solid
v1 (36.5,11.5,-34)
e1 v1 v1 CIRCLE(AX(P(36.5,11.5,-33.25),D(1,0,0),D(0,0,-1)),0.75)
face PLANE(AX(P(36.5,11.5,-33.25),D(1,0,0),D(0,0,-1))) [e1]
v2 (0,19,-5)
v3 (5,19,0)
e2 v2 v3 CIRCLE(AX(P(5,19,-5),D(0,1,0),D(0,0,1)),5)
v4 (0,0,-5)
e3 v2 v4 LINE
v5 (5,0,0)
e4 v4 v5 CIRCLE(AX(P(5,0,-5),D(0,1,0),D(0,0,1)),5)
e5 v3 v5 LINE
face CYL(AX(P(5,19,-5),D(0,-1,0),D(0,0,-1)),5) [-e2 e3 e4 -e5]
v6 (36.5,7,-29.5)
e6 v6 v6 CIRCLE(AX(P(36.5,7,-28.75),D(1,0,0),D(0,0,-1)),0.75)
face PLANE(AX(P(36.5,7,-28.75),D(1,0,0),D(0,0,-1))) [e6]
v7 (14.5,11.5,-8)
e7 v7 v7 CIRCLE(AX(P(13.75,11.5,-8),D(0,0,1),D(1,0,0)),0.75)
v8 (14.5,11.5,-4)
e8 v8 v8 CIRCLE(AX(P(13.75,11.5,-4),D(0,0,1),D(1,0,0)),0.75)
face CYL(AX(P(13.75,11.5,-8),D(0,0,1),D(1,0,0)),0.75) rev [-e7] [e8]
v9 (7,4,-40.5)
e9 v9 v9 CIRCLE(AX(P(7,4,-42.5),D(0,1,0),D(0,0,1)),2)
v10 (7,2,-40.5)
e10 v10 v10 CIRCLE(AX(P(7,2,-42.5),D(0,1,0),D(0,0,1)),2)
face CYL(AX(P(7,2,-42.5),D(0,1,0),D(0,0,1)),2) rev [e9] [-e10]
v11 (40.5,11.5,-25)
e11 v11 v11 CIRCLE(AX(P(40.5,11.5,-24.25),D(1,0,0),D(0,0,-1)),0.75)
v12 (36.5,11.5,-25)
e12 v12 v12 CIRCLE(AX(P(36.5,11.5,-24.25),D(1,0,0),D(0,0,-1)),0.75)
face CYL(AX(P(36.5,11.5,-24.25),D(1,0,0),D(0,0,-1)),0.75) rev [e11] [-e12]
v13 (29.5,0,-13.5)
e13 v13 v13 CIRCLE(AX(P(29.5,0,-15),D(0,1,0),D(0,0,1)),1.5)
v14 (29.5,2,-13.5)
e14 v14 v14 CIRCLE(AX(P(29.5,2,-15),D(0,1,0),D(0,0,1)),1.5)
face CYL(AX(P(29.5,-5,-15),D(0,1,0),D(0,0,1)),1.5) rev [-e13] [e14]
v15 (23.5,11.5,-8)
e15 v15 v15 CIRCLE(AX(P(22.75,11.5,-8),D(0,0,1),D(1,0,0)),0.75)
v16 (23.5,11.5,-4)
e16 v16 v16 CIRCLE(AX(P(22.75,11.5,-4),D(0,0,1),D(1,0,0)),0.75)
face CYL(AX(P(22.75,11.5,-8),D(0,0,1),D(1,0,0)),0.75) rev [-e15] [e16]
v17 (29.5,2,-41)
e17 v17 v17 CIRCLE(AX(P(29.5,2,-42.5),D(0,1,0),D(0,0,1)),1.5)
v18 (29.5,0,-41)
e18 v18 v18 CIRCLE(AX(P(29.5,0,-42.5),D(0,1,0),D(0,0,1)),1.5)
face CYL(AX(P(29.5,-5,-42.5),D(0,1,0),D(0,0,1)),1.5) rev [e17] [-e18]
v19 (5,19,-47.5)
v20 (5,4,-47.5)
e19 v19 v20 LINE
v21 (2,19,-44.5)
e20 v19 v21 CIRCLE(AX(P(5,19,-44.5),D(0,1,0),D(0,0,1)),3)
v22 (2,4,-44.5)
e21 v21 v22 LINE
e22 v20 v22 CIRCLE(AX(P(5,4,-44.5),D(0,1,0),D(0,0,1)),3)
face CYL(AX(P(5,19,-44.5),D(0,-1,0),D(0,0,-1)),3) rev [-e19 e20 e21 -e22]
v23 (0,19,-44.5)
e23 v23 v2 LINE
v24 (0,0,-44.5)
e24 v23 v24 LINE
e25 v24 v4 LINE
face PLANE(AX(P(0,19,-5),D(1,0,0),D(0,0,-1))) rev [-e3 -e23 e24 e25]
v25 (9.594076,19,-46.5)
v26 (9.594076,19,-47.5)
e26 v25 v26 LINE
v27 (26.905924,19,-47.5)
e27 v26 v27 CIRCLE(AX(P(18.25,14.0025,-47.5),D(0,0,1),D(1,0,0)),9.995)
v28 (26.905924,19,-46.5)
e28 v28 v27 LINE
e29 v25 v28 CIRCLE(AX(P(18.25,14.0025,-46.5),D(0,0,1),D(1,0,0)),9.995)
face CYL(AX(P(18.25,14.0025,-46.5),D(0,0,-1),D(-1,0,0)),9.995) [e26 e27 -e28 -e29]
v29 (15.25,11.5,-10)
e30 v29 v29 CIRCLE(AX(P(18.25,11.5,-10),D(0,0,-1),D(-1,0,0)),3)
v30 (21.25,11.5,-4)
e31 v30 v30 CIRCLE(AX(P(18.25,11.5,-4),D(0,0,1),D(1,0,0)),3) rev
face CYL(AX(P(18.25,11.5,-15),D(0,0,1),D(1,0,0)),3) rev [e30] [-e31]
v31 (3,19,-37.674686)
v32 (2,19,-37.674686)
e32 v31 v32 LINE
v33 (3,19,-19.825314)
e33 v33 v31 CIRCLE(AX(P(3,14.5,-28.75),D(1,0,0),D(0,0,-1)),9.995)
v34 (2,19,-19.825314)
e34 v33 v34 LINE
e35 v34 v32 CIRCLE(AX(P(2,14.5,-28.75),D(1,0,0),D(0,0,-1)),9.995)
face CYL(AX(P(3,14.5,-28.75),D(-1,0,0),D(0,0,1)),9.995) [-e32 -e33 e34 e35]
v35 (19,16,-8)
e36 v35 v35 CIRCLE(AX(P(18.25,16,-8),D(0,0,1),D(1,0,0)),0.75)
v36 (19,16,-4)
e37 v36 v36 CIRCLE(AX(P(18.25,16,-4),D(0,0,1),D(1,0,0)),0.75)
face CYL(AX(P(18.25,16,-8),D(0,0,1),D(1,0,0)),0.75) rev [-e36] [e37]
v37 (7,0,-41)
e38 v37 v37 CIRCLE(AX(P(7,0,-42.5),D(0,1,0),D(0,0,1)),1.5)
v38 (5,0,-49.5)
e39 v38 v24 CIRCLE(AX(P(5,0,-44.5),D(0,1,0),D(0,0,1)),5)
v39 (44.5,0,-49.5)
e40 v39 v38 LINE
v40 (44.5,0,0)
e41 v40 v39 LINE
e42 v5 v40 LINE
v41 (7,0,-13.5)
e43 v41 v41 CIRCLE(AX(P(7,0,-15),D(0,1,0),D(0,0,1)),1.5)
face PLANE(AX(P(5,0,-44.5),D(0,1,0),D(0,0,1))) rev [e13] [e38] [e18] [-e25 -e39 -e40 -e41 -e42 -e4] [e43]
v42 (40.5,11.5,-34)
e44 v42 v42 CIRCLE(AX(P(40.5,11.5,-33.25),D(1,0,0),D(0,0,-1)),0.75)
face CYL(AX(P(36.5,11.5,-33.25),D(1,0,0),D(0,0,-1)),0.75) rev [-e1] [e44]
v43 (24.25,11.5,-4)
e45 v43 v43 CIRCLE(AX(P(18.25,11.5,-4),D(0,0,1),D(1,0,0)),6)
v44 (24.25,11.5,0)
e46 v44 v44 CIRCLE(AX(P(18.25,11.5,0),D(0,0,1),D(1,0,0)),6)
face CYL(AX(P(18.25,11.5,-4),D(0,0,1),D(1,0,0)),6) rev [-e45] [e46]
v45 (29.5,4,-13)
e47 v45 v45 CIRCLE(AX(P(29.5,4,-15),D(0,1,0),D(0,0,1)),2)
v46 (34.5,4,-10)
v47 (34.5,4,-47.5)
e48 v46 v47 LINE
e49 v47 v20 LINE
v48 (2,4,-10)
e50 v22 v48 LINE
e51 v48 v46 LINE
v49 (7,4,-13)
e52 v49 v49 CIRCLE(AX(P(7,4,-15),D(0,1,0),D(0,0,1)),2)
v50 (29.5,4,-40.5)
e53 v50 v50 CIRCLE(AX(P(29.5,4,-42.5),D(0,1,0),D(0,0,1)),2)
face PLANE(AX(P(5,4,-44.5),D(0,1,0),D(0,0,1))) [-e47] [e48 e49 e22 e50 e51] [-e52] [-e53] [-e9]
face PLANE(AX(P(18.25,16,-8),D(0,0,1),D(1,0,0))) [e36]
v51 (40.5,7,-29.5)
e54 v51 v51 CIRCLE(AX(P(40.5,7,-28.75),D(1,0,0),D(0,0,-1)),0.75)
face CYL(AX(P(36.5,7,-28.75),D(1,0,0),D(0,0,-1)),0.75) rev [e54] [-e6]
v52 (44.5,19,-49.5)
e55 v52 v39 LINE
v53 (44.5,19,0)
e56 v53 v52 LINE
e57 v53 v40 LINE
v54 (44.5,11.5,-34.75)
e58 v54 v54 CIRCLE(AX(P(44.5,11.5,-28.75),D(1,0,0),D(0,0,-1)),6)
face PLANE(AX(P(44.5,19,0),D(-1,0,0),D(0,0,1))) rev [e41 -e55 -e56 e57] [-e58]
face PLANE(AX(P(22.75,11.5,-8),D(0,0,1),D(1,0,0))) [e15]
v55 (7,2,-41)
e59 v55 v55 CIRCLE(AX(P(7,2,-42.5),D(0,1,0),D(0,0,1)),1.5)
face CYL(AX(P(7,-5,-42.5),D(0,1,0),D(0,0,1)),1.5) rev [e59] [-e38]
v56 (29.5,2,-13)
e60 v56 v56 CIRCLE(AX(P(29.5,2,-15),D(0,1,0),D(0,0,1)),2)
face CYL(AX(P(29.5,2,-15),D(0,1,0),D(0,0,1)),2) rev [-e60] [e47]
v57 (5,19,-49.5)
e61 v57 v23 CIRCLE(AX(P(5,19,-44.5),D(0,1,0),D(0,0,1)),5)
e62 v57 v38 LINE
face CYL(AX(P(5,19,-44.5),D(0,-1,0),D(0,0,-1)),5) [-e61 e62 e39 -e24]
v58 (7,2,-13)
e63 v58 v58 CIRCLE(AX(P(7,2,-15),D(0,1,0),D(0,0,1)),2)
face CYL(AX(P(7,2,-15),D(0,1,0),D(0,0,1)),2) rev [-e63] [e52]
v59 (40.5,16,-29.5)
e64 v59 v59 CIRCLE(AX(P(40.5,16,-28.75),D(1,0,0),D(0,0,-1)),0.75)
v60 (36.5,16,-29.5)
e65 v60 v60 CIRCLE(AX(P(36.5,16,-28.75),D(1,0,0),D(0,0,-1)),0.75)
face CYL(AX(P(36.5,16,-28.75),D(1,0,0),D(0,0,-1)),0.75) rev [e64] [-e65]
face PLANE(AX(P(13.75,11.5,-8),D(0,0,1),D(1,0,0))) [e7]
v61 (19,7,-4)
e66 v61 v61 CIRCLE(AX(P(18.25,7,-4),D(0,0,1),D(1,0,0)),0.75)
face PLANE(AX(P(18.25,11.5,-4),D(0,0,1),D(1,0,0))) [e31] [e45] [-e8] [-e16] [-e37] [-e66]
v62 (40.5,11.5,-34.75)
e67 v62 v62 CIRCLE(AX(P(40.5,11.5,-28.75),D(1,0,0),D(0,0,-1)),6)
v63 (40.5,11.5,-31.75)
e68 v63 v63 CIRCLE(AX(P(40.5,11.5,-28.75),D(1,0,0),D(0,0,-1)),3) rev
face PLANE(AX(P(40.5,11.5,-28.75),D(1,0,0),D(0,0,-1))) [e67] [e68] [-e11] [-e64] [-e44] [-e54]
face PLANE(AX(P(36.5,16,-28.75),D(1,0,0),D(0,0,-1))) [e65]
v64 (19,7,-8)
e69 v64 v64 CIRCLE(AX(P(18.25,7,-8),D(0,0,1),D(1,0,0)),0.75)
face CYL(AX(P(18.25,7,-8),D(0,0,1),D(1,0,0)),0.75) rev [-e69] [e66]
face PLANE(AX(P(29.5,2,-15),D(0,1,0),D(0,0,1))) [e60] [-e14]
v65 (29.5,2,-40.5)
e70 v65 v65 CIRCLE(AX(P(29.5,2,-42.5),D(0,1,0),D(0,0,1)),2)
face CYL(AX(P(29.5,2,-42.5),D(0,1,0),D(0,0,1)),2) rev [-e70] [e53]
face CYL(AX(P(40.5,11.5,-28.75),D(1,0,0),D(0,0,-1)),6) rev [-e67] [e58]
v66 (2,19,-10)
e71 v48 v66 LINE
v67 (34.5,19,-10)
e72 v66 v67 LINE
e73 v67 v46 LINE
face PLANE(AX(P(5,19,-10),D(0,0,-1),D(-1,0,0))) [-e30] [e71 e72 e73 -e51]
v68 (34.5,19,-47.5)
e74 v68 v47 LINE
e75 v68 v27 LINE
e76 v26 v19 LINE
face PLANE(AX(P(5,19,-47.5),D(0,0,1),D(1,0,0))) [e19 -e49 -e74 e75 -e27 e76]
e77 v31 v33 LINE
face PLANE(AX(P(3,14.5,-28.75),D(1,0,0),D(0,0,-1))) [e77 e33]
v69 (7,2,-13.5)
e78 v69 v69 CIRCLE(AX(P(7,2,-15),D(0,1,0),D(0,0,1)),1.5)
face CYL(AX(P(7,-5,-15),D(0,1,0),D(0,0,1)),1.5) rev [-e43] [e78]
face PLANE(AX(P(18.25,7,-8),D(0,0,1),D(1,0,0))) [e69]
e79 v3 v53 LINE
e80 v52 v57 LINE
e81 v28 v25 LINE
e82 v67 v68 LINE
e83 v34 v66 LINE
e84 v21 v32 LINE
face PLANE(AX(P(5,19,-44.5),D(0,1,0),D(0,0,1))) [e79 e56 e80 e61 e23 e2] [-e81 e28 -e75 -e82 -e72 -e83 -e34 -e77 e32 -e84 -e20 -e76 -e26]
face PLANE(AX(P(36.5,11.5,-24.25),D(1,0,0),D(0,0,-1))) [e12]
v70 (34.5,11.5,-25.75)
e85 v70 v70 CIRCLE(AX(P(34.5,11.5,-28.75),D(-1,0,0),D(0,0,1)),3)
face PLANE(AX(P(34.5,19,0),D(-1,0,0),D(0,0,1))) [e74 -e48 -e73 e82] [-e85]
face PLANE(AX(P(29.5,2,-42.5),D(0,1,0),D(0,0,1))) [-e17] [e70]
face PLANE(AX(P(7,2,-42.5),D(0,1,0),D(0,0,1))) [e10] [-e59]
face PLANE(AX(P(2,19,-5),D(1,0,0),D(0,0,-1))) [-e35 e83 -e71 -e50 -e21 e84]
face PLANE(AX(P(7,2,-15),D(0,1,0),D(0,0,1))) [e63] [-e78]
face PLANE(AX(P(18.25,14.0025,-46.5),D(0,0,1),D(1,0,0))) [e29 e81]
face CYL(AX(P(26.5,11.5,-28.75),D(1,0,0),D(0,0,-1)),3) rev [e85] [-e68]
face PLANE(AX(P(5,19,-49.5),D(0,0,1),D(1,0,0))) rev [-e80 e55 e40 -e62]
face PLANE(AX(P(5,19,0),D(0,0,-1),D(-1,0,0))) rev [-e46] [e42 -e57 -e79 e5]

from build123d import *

# Parameters (mm, degrees)
EXTRUDE_1_DEPTH     = 19
SHELL_START         = 4
SHELL_2_DEPTH       = 15
SKETCH_2_R          = 3
CUT_EXTRUDE_1_DEPTH = 15
SKETCH_3_R          = 6
CUT_EXTRUDE_2_DEPTH = 4
SKETCH_4_R          = 3
CUT_EXTRUDE_3_DEPTH = 18
SKETCH_5_R          = 6
CUT_EXTRUDE_4_DEPTH = 4
SKETCH_8_R          = 0.75
CUT_EXTRUDE_5_DEPTH = 4
SKETCH_9_R          = 0.75
CUT_EXTRUDE_6_DEPTH = 4
EXTRUDE_4_DEPTH     = 1
EXTRUDE_5_DEPTH     = 1
SKETCH_13_R         = 2
CUT_EXTRUDE_7_DEPTH = 2
SKETCH_14_R         = 1.5
CUT_EXTRUDE_8_DEPTH = 9


# Read off the part's stored shape, not the designer's step: 抽壳2
with BuildPart() as part:
    # 草图1 → 凸台-拉伸1 (new body)
    with BuildSketch(Plane(origin=(0, 0, 0), x_dir=(1, 0, 0), z_dir=(0, 1, 0))):
        with BuildLine():
            Line((5, 0), (44.5, 0))
            Line((44.5, 0), (44.5, 49.5))
            Line((44.5, 49.5), (5, 49.5))
            ThreePointArc((5, 49.5), (1.464466094, 48.035533906), (0, 44.5))
            Line((0, 44.5), (0, 5))
            ThreePointArc((0, 5), (1.464466094, 1.464466094), (5, 0))
        make_face()
    extrude(amount=EXTRUDE_1_DEPTH)

    # 抽壳2 outline → 抽壳2 (cut)
    with BuildSketch(Plane(origin=(0, 0, 0), x_dir=(1, 0, 0), z_dir=(0, 1, 0)).offset(SHELL_START)):
        with BuildLine():
            ThreePointArc((5, 47.5), (2.878679656, 46.621320344), (2, 44.5))
            Line((2, 44.5), (2, 10))
            Line((2, 10), (34.5, 10))
            Line((34.5, 10), (34.5, 47.5))
            Line((34.5, 47.5), (5, 47.5))
        make_face()
    extrude(amount=SHELL_2_DEPTH, mode=Mode.SUBTRACT)

    # 草图2 → 切除-拉伸1 (cut)
    with BuildSketch(Plane.XY):
        with Locations((18.25, 11.5)):
            Circle(SKETCH_2_R)
    extrude(amount=-CUT_EXTRUDE_1_DEPTH, mode=Mode.SUBTRACT)

    # 草图3 → 切除-拉伸2 (cut)
    with BuildSketch(Plane.XY):
        with Locations((18.25, 11.5)):
            Circle(SKETCH_3_R)
    extrude(amount=-CUT_EXTRUDE_2_DEPTH, mode=Mode.SUBTRACT)

    # 草图4 → 切除-拉伸3 (cut)
    with BuildSketch(Plane(origin=(44.5, 0, 0), x_dir=(0, 0, -1), z_dir=(1, 0, 0))):
        with Locations((28.75, 11.5)):
            Circle(SKETCH_4_R)
    extrude(amount=-CUT_EXTRUDE_3_DEPTH, mode=Mode.SUBTRACT)

    # 草图5 → 切除-拉伸4 (cut)
    with BuildSketch(Plane(origin=(44.5, 0, 0), x_dir=(0, 0, -1), z_dir=(1, 0, 0))):
        with Locations((28.75, 11.5)):
            Circle(SKETCH_5_R)
    extrude(amount=-CUT_EXTRUDE_4_DEPTH, mode=Mode.SUBTRACT)

    # 草图8 → 切除-拉伸5 (cut)
    with BuildSketch(Plane(origin=(40.5, 0, 0), x_dir=(0, 0, -1), z_dir=(1, 0, 0))):
        with Locations((28.75, 16)):
            Circle(SKETCH_8_R)
        with Locations((33.25, 11.5)):
            Circle(SKETCH_8_R)
        with Locations((24.25, 11.5)):
            Circle(SKETCH_8_R)
        with Locations((28.75, 7)):
            Circle(SKETCH_8_R)
    extrude(amount=-CUT_EXTRUDE_5_DEPTH, mode=Mode.SUBTRACT)

    # 草图9 → 切除-拉伸6 (cut)
    with BuildSketch(Plane.XY.offset(-4)):
        with Locations((18.25, 16)):
            Circle(SKETCH_9_R)
        with Locations((22.75, 11.5)):
            Circle(SKETCH_9_R)
        with Locations((18.25, 7)):
            Circle(SKETCH_9_R)
        with Locations((13.75, 11.5)):
            Circle(SKETCH_9_R)
    extrude(amount=-CUT_EXTRUDE_6_DEPTH, mode=Mode.SUBTRACT)

    # 草图10 → 凸台-拉伸4 (add)
    with BuildSketch(Plane.XY.offset(-47.5)):
        with BuildLine():
            Line((9.594076089, 19), (26.905923911, 19))
            ThreePointArc((26.905923911, 19), (18.25, 4.0075), (9.594076089, 19))
        make_face()
    extrude(amount=EXTRUDE_4_DEPTH)

    # 草图11 → 凸台-拉伸5 (add)
    with BuildSketch(Plane(origin=(2, 0, 0), x_dir=(0, 0, -1), z_dir=(1, 0, 0))):
        with BuildLine():
            Line((19.825313731, 19), (37.674686269, 19))
            ThreePointArc((37.674686269, 19), (28.75, 4.505), (19.825313731, 19))
        make_face()
    extrude(amount=EXTRUDE_5_DEPTH)

    # 草图13 → 切除-拉伸7 (cut)
    with BuildSketch(Plane(origin=(0, 4, 0), x_dir=(1, 0, 0), z_dir=(0, 1, 0))):
        with Locations(Location((7, 15, 0), (0, 0, 270))):
            Circle(SKETCH_13_R)
        with Locations(Location((7, 42.5, 0), (0, 0, 270))):
            Circle(SKETCH_13_R)
        with Locations(Location((29.5, 15, 0), (0, 0, 270))):
            Circle(SKETCH_13_R)
        with Locations(Location((29.5, 42.5, 0), (0, 0, 270))):
            Circle(SKETCH_13_R)
    extrude(amount=-CUT_EXTRUDE_7_DEPTH, mode=Mode.SUBTRACT)

    # 草图14 → 切除-拉伸8 (cut)
    with BuildSketch(Plane(origin=(0, 4, 0), x_dir=(1, 0, 0), z_dir=(0, 1, 0))):
        with Locations(Location((7, 15, 0), (0, 0, 270))):
            Circle(SKETCH_14_R)
        with Locations(Location((7, 42.5, 0), (0, 0, 270))):
            Circle(SKETCH_14_R)
        with Locations(Location((29.5, 15, 0), (0, 0, 270))):
            Circle(SKETCH_14_R)
        with Locations(Location((29.5, 42.5, 0), (0, 0, 270))):
            Circle(SKETCH_14_R)
    extrude(amount=-CUT_EXTRUDE_8_DEPTH, mode=Mode.SUBTRACT)


solid = part.part
